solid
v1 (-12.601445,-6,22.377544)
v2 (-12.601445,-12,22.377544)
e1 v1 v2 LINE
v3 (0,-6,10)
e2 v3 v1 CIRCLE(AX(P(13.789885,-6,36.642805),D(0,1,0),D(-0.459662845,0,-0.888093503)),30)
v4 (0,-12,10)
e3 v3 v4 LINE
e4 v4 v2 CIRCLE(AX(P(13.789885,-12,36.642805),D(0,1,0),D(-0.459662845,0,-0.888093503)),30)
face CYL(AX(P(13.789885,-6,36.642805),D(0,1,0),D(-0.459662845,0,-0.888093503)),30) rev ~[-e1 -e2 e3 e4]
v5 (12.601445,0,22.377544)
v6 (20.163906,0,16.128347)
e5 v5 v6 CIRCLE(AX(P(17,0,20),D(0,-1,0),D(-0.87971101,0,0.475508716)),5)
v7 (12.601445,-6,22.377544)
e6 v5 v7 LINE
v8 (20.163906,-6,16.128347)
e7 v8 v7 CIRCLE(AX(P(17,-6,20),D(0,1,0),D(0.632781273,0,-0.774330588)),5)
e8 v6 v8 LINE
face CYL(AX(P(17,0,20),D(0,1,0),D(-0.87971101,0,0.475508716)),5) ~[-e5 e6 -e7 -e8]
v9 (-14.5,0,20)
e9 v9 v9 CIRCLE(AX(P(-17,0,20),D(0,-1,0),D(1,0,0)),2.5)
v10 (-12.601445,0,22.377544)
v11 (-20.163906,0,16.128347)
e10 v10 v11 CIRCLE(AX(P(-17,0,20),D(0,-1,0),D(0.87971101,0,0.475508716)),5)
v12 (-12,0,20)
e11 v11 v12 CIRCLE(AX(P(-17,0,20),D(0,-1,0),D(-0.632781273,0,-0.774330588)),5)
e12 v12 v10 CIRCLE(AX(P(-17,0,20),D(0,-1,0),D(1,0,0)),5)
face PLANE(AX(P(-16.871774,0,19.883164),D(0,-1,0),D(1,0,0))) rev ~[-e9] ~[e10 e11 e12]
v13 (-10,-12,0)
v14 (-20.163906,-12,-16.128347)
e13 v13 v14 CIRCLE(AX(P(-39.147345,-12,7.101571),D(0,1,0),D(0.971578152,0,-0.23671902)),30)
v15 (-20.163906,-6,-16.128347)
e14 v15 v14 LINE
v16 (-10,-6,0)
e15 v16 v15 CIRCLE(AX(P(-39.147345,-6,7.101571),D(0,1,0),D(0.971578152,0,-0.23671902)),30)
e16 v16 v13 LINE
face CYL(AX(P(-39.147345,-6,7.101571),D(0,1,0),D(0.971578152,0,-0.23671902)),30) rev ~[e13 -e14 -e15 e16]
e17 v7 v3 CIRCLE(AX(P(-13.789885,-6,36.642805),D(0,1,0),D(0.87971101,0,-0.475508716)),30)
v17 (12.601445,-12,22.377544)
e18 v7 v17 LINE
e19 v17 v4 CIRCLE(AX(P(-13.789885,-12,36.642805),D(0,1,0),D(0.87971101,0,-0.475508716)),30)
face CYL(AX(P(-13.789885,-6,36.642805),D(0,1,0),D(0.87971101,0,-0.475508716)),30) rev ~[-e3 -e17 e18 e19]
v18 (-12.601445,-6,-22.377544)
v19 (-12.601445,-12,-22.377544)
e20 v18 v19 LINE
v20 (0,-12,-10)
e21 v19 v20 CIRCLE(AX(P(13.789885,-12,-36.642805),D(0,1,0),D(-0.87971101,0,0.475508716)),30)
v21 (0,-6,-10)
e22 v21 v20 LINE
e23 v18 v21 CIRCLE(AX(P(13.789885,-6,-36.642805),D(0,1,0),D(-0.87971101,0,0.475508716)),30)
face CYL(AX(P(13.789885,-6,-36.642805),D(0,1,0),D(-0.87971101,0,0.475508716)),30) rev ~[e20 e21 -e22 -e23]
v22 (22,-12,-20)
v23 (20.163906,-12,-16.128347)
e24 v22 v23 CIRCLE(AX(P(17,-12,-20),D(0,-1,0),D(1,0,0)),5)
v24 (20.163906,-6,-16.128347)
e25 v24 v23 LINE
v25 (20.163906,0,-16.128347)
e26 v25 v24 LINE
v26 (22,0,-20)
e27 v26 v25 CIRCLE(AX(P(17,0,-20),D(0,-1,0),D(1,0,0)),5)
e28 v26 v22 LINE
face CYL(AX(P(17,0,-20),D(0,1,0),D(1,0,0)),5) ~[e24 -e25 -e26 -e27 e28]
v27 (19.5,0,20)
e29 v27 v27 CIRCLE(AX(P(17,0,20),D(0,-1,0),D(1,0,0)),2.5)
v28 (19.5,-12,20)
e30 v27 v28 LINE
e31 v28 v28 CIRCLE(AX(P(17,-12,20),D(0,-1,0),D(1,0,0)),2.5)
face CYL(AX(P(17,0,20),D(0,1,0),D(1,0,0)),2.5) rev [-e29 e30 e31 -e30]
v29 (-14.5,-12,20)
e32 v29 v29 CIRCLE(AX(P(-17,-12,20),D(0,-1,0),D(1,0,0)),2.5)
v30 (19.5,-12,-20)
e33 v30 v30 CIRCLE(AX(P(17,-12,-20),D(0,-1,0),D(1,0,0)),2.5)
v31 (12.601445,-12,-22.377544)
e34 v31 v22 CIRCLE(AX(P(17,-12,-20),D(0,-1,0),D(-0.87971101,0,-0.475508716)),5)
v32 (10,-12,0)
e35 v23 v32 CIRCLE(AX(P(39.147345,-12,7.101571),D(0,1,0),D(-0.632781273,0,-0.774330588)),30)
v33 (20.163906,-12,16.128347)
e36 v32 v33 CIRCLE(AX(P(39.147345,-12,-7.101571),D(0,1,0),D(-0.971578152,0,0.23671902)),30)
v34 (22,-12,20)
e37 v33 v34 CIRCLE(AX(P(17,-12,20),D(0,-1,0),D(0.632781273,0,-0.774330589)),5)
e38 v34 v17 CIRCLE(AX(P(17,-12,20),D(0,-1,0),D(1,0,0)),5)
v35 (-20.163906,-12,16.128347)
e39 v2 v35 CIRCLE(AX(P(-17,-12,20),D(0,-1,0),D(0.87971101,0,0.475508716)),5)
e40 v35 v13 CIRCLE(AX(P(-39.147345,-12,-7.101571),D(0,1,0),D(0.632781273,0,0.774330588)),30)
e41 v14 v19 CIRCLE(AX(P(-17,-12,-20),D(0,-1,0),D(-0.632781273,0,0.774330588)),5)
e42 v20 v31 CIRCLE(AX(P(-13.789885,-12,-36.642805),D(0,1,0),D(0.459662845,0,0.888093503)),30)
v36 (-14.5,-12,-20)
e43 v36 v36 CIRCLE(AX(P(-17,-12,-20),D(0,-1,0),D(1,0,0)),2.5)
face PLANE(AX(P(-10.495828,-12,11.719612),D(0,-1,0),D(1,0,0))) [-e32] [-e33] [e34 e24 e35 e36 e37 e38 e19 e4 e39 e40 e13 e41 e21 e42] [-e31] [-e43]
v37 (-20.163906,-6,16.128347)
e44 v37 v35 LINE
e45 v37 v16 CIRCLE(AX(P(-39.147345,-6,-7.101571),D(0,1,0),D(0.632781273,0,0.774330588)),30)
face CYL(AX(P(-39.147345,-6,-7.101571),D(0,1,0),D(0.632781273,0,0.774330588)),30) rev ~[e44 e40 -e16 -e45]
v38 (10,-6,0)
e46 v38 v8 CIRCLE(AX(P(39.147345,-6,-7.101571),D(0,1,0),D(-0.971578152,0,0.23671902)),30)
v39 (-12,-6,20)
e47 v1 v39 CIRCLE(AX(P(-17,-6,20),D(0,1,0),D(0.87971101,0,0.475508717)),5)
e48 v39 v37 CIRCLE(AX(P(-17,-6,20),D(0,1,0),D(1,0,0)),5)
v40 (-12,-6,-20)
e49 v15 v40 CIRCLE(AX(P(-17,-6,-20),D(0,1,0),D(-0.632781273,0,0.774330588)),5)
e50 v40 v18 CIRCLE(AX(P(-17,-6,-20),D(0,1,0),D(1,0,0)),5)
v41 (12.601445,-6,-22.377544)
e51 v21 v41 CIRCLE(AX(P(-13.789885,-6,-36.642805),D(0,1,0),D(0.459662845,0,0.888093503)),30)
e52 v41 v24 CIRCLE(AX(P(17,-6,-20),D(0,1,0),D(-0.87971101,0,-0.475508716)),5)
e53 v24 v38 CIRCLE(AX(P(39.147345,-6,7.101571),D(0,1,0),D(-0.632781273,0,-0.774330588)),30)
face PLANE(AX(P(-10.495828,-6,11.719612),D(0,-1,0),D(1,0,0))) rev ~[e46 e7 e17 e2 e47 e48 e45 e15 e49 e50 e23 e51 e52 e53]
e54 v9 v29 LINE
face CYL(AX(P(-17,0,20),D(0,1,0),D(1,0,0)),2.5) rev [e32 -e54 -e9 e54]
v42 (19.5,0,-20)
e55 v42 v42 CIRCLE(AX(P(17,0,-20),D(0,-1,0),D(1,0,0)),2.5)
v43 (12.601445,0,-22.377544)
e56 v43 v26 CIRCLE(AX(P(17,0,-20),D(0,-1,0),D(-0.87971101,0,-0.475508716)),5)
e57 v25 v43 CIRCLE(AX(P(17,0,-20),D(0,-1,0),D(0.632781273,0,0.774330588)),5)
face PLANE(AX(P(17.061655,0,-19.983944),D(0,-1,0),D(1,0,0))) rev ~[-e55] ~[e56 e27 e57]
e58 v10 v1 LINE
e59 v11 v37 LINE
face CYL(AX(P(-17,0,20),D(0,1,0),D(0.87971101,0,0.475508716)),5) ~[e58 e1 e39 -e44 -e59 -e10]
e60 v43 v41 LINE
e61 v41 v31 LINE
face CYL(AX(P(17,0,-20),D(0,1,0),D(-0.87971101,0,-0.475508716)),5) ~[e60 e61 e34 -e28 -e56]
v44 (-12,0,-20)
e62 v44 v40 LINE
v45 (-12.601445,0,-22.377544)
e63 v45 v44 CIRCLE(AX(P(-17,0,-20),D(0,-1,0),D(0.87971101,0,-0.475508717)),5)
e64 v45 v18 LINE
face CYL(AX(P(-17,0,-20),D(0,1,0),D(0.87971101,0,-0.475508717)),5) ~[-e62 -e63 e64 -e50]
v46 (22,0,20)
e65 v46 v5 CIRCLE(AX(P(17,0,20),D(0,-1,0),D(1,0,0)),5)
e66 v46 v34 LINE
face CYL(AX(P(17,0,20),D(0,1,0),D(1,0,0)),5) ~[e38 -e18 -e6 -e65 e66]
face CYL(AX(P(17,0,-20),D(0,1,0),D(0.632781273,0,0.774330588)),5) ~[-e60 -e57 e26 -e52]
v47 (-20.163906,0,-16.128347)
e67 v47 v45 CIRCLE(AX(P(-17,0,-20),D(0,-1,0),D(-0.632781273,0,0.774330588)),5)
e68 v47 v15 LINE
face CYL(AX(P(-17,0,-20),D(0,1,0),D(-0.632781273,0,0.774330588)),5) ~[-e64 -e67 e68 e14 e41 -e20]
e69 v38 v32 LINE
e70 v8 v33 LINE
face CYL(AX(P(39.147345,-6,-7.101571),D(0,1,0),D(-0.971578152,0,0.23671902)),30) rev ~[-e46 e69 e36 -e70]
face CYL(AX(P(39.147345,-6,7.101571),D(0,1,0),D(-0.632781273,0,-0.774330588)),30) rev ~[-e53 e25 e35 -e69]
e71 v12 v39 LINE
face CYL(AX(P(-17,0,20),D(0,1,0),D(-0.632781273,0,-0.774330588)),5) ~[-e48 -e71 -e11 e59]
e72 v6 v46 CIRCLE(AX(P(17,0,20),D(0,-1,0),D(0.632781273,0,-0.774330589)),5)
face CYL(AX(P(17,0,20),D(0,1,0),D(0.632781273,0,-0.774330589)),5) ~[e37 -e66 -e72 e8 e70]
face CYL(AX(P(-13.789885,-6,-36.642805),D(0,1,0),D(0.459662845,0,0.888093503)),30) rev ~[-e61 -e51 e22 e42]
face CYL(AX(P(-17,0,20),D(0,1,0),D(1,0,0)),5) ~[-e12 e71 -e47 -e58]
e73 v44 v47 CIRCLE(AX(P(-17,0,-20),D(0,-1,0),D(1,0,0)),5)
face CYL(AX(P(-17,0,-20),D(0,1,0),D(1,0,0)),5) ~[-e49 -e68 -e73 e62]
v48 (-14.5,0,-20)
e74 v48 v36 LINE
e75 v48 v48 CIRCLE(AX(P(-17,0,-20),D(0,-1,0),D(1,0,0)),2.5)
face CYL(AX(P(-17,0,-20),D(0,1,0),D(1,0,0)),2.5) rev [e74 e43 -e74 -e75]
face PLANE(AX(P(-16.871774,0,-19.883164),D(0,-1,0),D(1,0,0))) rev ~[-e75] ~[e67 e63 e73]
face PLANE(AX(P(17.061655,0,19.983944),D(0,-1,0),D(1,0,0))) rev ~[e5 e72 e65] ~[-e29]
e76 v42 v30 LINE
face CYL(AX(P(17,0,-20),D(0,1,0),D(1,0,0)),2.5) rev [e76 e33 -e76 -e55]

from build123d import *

# Parameters (mm, degrees)
F0_R     = 2.5
F1_DEPTH = 12
F2_START = 6
F2_DEPTH = 6


# Not quite as in the source:
# - a feature names something its author has since deleted; it is built from what else it names


with BuildPart() as f1:
    # F0 (on Front) → F1 (new body)
    with BuildSketch(Plane.XZ):
        with BuildLine():
            ThreePointArc((-20.1639063661, 16.1283470576), (-14.8575168414, 15.4822831081), (-12, 20))
            ThreePointArc((-12, 20), (-12.1526927453, 21.2262187321), (-12.6014449516, 22.3775435823))
            ThreePointArc((-12.6014449516, 22.3775435823), (-20.1849966473, 23.8543217765), (-20.1639063661, 16.1283470576))
        make_face()
        with Locations((-17, 20)):
            Circle(F0_R, mode=Mode.SUBTRACT)
    extrude(amount=F1_DEPTH)



with BuildPart() as f1b:
    # F0 (on Front) → F1, piece 2 (new body)
    with BuildSketch(Plane.XZ):
        with BuildLine():
            ThreePointArc((22, 20), (18.2262187321, 24.8473072547), (12.6014449516, 22.3775435823))
            ThreePointArc((12.6014449516, 22.3775435823), (13.8150033527, 16.1456782235), (20.1639063661, 16.1283470576))
            ThreePointArc((20.1639063661, 16.1283470576), (21.5177168919, 17.8575168414), (22, 20))
        make_face()
        with Locations((17, 20)):
            Circle(F0_R, mode=Mode.SUBTRACT)
    extrude(amount=F1_DEPTH)


with BuildPart() as f1c:
    # F0 (on Front) → F1, piece 3 (new body)
    with BuildSketch(Plane.XZ):
        with BuildLine():
            ThreePointArc((22, -20), (21.5177168919, -17.8575168414), (20.1639063661, -16.1283470576))
            ThreePointArc((20.1639063661, -16.1283470576), (13.8150033527, -16.1456782235), (12.6014449516, -22.3775435823))
            ThreePointArc((12.6014449516, -22.3775435823), (18.2262187321, -24.8473072547), (22, -20))
        make_face()
        with Locations((17, -20)):
            Circle(F0_R, mode=Mode.SUBTRACT)
    extrude(amount=F1_DEPTH)


with BuildPart() as f1d:
    # F0 (on Front) → F1, piece 4 (new body)
    with BuildSketch(Plane.XZ):
        with BuildLine():
            ThreePointArc((-12, -20), (-14.8575168414, -15.4822831081), (-20.1639063661, -16.1283470576))
            ThreePointArc((-20.1639063661, -16.1283470576), (-20.1849966473, -23.8543217765), (-12.6014449516, -22.3775435823))
            ThreePointArc((-12.6014449516, -22.3775435823), (-12.1526927453, -21.2262187321), (-12, -20))
        make_face()
        with Locations((-17, -20)):
            Circle(F0_R, mode=Mode.SUBTRACT)
    extrude(amount=F1_DEPTH)


with BuildPart() as f1_1:
    add(f1.part)

    add(f1b.part)  # F2 merges F1b

    add(f1c.part)  # F2 merges F1c

    add(f1d.part)  # F2 merges F1d
    # F0 (on Front) → F2 (join)
    with BuildSketch(Plane.XZ.offset(F2_START)):
        with BuildLine():
            ThreePointArc((-12.6014449516, 22.3775435823), (-12.1526927453, 21.2262187321), (-12, 20))
            ThreePointArc((-12, 20), (-14.8575168414, 15.4822831081), (-20.1639063661, 16.1283470576))
            ThreePointArc((-20.1639063661, 16.1283470576), (-13.766762281, 8.8929923243), (-10, 0))
            ThreePointArc((-10, 0), (-7.0710678119, 7.0710678119), (0, 10))
            ThreePointArc((0, 10), (-7.2323271671, 15.2403150028), (-12.6014449516, 22.3775435823))
        make_face()
        with BuildLine():
            ThreePointArc((10, 0), (7.0710678119, 7.0710678119), (0, 10))
            ThreePointArc((0, 10), (-7.0710678119, 7.0710678119), (-10, 0))
            ThreePointArc((-10, 0), (-7.0710678119, -7.0710678119), (0, -10))
            ThreePointArc((0, -10), (7.0710678119, -7.0710678119), (10, 0))
        make_face()
        with BuildLine():
            ThreePointArc((0, -10), (-7.0710678119, -7.0710678119), (-10, 0))
            ThreePointArc((-10, 0), (-13.766762281, -8.8929923243), (-20.1639063661, -16.1283470576))
            ThreePointArc((-20.1639063661, -16.1283470576), (-14.8575168414, -15.4822831081), (-12, -20))
            ThreePointArc((-12, -20), (-12.1526927453, -21.2262187321), (-12.6014449516, -22.3775435823))
            ThreePointArc((-12.6014449516, -22.3775435823), (-7.2323271671, -15.2403150028), (0, -10))
        make_face()
        with BuildLine():
            ThreePointArc((20.1639063661, -16.1283470576), (13.766762281, -8.8929923243), (10, 0))
            ThreePointArc((10, 0), (7.0710678119, -7.0710678119), (0, -10))
            ThreePointArc((0, -10), (7.2323271671, -15.2403150028), (12.6014449516, -22.3775435823))
            ThreePointArc((12.6014449516, -22.3775435823), (13.8150033527, -16.1456782235), (20.1639063661, -16.1283470576))
        make_face()
        with BuildLine():
            ThreePointArc((12.6014449516, 22.3775435823), (7.2323271671, 15.2403150028), (0, 10))
            ThreePointArc((0, 10), (7.0710678119, 7.0710678119), (10, 0))
            ThreePointArc((10, 0), (13.766762281, 8.8929923243), (20.1639063661, 16.1283470576))
            ThreePointArc((20.1639063661, 16.1283470576), (13.8150033527, 16.1456782235), (12.6014449516, 22.3775435823))
        make_face()
    extrude(amount=F2_DEPTH)


solid = f1_1.part
